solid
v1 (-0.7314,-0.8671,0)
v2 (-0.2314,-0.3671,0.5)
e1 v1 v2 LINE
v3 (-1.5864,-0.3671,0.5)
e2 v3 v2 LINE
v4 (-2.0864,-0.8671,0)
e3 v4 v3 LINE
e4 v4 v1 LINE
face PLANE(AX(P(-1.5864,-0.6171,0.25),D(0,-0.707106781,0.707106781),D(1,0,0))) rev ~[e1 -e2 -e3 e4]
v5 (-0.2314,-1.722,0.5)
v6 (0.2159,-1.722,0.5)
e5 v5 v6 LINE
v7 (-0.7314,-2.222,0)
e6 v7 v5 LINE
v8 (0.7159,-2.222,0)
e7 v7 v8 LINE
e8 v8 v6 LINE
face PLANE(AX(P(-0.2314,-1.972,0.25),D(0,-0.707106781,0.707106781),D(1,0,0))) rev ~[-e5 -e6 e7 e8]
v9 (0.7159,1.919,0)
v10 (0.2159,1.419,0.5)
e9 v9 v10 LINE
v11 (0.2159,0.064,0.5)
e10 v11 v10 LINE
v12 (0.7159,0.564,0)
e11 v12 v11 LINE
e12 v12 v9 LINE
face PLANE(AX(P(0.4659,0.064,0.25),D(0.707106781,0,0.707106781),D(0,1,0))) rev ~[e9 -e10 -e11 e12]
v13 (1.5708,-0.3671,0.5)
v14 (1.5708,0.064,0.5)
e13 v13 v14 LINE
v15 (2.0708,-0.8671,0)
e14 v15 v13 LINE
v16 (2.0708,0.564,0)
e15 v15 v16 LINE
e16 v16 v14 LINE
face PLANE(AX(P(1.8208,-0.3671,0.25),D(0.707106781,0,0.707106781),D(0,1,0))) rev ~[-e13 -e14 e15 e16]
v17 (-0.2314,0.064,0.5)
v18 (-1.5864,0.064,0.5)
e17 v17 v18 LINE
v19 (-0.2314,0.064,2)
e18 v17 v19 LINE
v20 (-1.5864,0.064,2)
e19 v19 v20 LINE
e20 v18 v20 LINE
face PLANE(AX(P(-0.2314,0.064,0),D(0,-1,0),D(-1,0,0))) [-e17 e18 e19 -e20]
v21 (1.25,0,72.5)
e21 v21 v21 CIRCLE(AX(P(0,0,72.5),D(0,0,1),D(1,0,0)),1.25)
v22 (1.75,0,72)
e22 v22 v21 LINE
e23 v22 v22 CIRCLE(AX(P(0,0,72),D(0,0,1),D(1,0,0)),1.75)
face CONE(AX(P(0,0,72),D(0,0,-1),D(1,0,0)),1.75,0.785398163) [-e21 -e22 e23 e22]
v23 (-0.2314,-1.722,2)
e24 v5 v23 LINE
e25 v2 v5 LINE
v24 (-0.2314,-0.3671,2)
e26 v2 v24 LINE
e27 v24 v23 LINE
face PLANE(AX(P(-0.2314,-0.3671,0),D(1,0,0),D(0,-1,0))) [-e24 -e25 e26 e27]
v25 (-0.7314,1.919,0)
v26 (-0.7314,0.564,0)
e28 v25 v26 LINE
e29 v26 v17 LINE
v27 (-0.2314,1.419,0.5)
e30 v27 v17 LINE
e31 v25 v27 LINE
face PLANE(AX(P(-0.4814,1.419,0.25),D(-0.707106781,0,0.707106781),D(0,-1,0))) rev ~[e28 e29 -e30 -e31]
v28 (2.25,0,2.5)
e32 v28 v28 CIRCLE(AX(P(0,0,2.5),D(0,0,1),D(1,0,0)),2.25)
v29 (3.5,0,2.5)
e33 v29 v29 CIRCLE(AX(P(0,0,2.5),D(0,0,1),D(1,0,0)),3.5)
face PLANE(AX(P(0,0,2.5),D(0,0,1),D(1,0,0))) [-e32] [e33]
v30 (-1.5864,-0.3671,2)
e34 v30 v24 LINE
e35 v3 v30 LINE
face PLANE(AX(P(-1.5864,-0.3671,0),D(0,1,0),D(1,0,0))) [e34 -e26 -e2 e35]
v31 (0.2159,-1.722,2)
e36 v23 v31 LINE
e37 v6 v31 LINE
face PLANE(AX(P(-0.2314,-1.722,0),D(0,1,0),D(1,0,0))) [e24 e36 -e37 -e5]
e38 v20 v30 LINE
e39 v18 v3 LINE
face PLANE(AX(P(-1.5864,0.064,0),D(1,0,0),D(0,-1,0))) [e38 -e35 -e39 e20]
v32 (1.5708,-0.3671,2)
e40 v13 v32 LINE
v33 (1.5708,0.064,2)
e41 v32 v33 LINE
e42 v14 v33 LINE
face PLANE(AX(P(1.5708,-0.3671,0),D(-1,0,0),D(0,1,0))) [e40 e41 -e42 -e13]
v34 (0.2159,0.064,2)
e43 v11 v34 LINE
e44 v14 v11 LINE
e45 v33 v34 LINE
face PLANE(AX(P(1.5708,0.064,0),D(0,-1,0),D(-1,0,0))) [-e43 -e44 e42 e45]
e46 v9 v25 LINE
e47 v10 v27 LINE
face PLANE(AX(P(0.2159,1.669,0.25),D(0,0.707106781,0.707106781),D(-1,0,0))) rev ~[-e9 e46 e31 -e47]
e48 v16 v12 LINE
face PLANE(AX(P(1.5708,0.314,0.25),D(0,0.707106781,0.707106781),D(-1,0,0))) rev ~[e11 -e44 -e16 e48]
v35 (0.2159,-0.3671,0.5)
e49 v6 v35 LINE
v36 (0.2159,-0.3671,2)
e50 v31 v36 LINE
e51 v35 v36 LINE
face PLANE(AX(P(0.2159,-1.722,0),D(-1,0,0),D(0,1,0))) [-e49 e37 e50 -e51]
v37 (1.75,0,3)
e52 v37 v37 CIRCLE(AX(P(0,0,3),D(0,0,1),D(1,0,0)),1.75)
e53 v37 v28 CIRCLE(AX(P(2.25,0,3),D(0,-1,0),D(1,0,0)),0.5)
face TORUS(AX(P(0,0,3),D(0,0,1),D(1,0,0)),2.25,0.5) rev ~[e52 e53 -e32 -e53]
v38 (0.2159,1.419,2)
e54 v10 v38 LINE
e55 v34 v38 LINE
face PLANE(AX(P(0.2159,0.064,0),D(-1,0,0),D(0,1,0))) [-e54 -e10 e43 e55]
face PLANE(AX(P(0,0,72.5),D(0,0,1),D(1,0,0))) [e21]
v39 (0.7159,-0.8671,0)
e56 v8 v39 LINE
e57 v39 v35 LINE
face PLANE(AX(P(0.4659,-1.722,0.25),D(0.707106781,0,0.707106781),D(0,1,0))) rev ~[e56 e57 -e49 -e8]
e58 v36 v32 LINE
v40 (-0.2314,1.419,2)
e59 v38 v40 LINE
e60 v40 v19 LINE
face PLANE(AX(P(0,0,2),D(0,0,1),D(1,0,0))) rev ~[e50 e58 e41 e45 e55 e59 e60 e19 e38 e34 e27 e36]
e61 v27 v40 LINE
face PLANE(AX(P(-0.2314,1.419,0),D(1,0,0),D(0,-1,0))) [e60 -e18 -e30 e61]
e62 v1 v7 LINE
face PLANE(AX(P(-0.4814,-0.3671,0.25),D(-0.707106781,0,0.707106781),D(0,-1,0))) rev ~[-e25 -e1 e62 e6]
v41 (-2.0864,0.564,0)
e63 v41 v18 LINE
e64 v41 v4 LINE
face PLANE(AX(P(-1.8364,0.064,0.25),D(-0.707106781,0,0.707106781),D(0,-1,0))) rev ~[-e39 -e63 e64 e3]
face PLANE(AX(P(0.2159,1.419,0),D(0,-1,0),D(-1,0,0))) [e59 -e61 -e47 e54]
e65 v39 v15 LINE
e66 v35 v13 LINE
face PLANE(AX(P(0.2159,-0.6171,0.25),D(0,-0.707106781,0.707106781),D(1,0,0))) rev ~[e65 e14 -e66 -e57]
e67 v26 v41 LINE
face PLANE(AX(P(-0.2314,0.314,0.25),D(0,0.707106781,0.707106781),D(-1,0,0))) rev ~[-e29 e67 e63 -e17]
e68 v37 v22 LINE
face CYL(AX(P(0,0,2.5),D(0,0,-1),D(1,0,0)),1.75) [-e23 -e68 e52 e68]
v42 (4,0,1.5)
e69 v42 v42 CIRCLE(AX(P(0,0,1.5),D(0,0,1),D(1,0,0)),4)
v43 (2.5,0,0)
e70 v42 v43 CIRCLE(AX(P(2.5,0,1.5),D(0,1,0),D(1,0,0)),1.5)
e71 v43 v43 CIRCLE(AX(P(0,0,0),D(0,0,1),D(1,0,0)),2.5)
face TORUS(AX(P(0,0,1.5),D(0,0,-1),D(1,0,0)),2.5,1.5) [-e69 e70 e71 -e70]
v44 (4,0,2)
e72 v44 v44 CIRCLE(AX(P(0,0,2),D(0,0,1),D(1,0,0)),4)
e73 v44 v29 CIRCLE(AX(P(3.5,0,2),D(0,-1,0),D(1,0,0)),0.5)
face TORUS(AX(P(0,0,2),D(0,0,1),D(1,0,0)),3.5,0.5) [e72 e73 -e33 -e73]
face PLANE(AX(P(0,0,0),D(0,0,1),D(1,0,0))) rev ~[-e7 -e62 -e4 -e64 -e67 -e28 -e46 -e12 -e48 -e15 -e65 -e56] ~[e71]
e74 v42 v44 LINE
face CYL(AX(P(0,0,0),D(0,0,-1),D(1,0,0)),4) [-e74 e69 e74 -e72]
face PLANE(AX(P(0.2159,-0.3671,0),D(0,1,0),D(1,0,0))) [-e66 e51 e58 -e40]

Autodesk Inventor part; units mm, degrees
ref_plane "YZ Plane" through (0, 0, 0) normal (1, 0, 0) x (0, 1, 0)
ref_plane "XZ Plane" through (0, 0, 0) normal (0, 1, 0) x (-1, 0, 0)
ref_plane "XY Plane" through (0, 0, 0) normal (0, 0, 1) x (1, 0, 0)
sketch "Sketch1" plane through (0, 0, 0) normal (0, 0, 1) x (1, 0, 0)
  circle A0 centre (0, 0) radius 4
  dimension "d0" = 8
extrude "Extrusion1" add sketch "Sketch1" along normal blind 2.5
sketch "Sketch2" plane through (0, 0, 2.5) normal (0, 0, 1) x (1, 0, 0)
  circle A0 centre (0, 0) radius 1.75
  dimension "d3" = 3.5
extrude "Extrusion2" add sketch "Sketch2" along normal blind 70
thread "Thread1" size "M3.5x0.6" class "6g" standard "ANSI Metric M Profile" length 45 offset 25
chamfer "Chamfer1" distance 0.5 angle 45 1 edges at (-1.75, 0, 72.5)
fillet "Fillet1" radius 0.5 1 edges at (-1.75, 0, 2.5)
fillet "Fillet2" radius 1.5 1 edges at (-4, 0, 0)
sketch "Sketch3" plane through (0, 0, 0) normal (0, 0, -1) x (-1, 0, 0)
  line L0 (-1.9955, 1.419) -> (0.9534, 1.419) construction
  line L1 (0.9534, 1.419) -> (0.9534, -1.1751) construction
  line L2 (0.9534, -1.1751) -> (-1.9955, -1.1751) construction
  line L3 (-1.9955, -1.1751) -> (-1.9955, 1.419) construction
  line L4 (1.5864, -0.3671) -> (0.2314, -0.3671)
  line L5 (0.2314, -0.3671) -> (0.2314, -1.722)
  line L6 (0.2314, -1.722) -> (-0.2159, -1.722)
  line L7 (-0.2159, -1.722) -> (-0.2159, -0.3671)
  line L8 (-0.2159, -0.3671) -> (-1.5708, -0.3671)
  line L9 (-1.5708, -0.3671) -> (-1.5708, 0.064)
  line L10 (-1.5708, 0.064) -> (-0.2159, 0.064)
  line L11 (-0.2159, 0.064) -> (-0.2159, 1.419)
  line L12 (-0.2159, 1.419) -> (0.2314, 1.419)
  line L13 (0.2314, 1.419) -> (0.2314, 0.064)
  line L14 (0.2314, 0.064) -> (1.5864, 0.064)
  line L15 (1.5864, 0.064) -> (1.5864, -0.3671)
  point P0 (0, 0)
emboss "Emboss1" sketch "Sketch3" operation cut depth 2 direction (0, 0, 1)
chamfer "Chamfer2" distance 0.5 angle 45 12 edges at (-1.5864, -0.1515, 0) (-0.9089, -0.3671, 0) (-0.2314, -1.0445, 0) (-0.0078, -1.722, 0) (0.2159, -1.0445, 0) (0.8934, -0.3671, 0) (1.5708, -0.1515, 0) (0.8934, 0.064, 0) (0.2159, 0.7415, 0) (-0.0078, 1.419, 0) (-0.2314, 0.7415, 0) (-0.9089, 0.064, 0)
fillet "Fillet3" radius 0.5 1 edges at (-4, 0, 2.5)
properties part number "screw" material "Aluminum"
